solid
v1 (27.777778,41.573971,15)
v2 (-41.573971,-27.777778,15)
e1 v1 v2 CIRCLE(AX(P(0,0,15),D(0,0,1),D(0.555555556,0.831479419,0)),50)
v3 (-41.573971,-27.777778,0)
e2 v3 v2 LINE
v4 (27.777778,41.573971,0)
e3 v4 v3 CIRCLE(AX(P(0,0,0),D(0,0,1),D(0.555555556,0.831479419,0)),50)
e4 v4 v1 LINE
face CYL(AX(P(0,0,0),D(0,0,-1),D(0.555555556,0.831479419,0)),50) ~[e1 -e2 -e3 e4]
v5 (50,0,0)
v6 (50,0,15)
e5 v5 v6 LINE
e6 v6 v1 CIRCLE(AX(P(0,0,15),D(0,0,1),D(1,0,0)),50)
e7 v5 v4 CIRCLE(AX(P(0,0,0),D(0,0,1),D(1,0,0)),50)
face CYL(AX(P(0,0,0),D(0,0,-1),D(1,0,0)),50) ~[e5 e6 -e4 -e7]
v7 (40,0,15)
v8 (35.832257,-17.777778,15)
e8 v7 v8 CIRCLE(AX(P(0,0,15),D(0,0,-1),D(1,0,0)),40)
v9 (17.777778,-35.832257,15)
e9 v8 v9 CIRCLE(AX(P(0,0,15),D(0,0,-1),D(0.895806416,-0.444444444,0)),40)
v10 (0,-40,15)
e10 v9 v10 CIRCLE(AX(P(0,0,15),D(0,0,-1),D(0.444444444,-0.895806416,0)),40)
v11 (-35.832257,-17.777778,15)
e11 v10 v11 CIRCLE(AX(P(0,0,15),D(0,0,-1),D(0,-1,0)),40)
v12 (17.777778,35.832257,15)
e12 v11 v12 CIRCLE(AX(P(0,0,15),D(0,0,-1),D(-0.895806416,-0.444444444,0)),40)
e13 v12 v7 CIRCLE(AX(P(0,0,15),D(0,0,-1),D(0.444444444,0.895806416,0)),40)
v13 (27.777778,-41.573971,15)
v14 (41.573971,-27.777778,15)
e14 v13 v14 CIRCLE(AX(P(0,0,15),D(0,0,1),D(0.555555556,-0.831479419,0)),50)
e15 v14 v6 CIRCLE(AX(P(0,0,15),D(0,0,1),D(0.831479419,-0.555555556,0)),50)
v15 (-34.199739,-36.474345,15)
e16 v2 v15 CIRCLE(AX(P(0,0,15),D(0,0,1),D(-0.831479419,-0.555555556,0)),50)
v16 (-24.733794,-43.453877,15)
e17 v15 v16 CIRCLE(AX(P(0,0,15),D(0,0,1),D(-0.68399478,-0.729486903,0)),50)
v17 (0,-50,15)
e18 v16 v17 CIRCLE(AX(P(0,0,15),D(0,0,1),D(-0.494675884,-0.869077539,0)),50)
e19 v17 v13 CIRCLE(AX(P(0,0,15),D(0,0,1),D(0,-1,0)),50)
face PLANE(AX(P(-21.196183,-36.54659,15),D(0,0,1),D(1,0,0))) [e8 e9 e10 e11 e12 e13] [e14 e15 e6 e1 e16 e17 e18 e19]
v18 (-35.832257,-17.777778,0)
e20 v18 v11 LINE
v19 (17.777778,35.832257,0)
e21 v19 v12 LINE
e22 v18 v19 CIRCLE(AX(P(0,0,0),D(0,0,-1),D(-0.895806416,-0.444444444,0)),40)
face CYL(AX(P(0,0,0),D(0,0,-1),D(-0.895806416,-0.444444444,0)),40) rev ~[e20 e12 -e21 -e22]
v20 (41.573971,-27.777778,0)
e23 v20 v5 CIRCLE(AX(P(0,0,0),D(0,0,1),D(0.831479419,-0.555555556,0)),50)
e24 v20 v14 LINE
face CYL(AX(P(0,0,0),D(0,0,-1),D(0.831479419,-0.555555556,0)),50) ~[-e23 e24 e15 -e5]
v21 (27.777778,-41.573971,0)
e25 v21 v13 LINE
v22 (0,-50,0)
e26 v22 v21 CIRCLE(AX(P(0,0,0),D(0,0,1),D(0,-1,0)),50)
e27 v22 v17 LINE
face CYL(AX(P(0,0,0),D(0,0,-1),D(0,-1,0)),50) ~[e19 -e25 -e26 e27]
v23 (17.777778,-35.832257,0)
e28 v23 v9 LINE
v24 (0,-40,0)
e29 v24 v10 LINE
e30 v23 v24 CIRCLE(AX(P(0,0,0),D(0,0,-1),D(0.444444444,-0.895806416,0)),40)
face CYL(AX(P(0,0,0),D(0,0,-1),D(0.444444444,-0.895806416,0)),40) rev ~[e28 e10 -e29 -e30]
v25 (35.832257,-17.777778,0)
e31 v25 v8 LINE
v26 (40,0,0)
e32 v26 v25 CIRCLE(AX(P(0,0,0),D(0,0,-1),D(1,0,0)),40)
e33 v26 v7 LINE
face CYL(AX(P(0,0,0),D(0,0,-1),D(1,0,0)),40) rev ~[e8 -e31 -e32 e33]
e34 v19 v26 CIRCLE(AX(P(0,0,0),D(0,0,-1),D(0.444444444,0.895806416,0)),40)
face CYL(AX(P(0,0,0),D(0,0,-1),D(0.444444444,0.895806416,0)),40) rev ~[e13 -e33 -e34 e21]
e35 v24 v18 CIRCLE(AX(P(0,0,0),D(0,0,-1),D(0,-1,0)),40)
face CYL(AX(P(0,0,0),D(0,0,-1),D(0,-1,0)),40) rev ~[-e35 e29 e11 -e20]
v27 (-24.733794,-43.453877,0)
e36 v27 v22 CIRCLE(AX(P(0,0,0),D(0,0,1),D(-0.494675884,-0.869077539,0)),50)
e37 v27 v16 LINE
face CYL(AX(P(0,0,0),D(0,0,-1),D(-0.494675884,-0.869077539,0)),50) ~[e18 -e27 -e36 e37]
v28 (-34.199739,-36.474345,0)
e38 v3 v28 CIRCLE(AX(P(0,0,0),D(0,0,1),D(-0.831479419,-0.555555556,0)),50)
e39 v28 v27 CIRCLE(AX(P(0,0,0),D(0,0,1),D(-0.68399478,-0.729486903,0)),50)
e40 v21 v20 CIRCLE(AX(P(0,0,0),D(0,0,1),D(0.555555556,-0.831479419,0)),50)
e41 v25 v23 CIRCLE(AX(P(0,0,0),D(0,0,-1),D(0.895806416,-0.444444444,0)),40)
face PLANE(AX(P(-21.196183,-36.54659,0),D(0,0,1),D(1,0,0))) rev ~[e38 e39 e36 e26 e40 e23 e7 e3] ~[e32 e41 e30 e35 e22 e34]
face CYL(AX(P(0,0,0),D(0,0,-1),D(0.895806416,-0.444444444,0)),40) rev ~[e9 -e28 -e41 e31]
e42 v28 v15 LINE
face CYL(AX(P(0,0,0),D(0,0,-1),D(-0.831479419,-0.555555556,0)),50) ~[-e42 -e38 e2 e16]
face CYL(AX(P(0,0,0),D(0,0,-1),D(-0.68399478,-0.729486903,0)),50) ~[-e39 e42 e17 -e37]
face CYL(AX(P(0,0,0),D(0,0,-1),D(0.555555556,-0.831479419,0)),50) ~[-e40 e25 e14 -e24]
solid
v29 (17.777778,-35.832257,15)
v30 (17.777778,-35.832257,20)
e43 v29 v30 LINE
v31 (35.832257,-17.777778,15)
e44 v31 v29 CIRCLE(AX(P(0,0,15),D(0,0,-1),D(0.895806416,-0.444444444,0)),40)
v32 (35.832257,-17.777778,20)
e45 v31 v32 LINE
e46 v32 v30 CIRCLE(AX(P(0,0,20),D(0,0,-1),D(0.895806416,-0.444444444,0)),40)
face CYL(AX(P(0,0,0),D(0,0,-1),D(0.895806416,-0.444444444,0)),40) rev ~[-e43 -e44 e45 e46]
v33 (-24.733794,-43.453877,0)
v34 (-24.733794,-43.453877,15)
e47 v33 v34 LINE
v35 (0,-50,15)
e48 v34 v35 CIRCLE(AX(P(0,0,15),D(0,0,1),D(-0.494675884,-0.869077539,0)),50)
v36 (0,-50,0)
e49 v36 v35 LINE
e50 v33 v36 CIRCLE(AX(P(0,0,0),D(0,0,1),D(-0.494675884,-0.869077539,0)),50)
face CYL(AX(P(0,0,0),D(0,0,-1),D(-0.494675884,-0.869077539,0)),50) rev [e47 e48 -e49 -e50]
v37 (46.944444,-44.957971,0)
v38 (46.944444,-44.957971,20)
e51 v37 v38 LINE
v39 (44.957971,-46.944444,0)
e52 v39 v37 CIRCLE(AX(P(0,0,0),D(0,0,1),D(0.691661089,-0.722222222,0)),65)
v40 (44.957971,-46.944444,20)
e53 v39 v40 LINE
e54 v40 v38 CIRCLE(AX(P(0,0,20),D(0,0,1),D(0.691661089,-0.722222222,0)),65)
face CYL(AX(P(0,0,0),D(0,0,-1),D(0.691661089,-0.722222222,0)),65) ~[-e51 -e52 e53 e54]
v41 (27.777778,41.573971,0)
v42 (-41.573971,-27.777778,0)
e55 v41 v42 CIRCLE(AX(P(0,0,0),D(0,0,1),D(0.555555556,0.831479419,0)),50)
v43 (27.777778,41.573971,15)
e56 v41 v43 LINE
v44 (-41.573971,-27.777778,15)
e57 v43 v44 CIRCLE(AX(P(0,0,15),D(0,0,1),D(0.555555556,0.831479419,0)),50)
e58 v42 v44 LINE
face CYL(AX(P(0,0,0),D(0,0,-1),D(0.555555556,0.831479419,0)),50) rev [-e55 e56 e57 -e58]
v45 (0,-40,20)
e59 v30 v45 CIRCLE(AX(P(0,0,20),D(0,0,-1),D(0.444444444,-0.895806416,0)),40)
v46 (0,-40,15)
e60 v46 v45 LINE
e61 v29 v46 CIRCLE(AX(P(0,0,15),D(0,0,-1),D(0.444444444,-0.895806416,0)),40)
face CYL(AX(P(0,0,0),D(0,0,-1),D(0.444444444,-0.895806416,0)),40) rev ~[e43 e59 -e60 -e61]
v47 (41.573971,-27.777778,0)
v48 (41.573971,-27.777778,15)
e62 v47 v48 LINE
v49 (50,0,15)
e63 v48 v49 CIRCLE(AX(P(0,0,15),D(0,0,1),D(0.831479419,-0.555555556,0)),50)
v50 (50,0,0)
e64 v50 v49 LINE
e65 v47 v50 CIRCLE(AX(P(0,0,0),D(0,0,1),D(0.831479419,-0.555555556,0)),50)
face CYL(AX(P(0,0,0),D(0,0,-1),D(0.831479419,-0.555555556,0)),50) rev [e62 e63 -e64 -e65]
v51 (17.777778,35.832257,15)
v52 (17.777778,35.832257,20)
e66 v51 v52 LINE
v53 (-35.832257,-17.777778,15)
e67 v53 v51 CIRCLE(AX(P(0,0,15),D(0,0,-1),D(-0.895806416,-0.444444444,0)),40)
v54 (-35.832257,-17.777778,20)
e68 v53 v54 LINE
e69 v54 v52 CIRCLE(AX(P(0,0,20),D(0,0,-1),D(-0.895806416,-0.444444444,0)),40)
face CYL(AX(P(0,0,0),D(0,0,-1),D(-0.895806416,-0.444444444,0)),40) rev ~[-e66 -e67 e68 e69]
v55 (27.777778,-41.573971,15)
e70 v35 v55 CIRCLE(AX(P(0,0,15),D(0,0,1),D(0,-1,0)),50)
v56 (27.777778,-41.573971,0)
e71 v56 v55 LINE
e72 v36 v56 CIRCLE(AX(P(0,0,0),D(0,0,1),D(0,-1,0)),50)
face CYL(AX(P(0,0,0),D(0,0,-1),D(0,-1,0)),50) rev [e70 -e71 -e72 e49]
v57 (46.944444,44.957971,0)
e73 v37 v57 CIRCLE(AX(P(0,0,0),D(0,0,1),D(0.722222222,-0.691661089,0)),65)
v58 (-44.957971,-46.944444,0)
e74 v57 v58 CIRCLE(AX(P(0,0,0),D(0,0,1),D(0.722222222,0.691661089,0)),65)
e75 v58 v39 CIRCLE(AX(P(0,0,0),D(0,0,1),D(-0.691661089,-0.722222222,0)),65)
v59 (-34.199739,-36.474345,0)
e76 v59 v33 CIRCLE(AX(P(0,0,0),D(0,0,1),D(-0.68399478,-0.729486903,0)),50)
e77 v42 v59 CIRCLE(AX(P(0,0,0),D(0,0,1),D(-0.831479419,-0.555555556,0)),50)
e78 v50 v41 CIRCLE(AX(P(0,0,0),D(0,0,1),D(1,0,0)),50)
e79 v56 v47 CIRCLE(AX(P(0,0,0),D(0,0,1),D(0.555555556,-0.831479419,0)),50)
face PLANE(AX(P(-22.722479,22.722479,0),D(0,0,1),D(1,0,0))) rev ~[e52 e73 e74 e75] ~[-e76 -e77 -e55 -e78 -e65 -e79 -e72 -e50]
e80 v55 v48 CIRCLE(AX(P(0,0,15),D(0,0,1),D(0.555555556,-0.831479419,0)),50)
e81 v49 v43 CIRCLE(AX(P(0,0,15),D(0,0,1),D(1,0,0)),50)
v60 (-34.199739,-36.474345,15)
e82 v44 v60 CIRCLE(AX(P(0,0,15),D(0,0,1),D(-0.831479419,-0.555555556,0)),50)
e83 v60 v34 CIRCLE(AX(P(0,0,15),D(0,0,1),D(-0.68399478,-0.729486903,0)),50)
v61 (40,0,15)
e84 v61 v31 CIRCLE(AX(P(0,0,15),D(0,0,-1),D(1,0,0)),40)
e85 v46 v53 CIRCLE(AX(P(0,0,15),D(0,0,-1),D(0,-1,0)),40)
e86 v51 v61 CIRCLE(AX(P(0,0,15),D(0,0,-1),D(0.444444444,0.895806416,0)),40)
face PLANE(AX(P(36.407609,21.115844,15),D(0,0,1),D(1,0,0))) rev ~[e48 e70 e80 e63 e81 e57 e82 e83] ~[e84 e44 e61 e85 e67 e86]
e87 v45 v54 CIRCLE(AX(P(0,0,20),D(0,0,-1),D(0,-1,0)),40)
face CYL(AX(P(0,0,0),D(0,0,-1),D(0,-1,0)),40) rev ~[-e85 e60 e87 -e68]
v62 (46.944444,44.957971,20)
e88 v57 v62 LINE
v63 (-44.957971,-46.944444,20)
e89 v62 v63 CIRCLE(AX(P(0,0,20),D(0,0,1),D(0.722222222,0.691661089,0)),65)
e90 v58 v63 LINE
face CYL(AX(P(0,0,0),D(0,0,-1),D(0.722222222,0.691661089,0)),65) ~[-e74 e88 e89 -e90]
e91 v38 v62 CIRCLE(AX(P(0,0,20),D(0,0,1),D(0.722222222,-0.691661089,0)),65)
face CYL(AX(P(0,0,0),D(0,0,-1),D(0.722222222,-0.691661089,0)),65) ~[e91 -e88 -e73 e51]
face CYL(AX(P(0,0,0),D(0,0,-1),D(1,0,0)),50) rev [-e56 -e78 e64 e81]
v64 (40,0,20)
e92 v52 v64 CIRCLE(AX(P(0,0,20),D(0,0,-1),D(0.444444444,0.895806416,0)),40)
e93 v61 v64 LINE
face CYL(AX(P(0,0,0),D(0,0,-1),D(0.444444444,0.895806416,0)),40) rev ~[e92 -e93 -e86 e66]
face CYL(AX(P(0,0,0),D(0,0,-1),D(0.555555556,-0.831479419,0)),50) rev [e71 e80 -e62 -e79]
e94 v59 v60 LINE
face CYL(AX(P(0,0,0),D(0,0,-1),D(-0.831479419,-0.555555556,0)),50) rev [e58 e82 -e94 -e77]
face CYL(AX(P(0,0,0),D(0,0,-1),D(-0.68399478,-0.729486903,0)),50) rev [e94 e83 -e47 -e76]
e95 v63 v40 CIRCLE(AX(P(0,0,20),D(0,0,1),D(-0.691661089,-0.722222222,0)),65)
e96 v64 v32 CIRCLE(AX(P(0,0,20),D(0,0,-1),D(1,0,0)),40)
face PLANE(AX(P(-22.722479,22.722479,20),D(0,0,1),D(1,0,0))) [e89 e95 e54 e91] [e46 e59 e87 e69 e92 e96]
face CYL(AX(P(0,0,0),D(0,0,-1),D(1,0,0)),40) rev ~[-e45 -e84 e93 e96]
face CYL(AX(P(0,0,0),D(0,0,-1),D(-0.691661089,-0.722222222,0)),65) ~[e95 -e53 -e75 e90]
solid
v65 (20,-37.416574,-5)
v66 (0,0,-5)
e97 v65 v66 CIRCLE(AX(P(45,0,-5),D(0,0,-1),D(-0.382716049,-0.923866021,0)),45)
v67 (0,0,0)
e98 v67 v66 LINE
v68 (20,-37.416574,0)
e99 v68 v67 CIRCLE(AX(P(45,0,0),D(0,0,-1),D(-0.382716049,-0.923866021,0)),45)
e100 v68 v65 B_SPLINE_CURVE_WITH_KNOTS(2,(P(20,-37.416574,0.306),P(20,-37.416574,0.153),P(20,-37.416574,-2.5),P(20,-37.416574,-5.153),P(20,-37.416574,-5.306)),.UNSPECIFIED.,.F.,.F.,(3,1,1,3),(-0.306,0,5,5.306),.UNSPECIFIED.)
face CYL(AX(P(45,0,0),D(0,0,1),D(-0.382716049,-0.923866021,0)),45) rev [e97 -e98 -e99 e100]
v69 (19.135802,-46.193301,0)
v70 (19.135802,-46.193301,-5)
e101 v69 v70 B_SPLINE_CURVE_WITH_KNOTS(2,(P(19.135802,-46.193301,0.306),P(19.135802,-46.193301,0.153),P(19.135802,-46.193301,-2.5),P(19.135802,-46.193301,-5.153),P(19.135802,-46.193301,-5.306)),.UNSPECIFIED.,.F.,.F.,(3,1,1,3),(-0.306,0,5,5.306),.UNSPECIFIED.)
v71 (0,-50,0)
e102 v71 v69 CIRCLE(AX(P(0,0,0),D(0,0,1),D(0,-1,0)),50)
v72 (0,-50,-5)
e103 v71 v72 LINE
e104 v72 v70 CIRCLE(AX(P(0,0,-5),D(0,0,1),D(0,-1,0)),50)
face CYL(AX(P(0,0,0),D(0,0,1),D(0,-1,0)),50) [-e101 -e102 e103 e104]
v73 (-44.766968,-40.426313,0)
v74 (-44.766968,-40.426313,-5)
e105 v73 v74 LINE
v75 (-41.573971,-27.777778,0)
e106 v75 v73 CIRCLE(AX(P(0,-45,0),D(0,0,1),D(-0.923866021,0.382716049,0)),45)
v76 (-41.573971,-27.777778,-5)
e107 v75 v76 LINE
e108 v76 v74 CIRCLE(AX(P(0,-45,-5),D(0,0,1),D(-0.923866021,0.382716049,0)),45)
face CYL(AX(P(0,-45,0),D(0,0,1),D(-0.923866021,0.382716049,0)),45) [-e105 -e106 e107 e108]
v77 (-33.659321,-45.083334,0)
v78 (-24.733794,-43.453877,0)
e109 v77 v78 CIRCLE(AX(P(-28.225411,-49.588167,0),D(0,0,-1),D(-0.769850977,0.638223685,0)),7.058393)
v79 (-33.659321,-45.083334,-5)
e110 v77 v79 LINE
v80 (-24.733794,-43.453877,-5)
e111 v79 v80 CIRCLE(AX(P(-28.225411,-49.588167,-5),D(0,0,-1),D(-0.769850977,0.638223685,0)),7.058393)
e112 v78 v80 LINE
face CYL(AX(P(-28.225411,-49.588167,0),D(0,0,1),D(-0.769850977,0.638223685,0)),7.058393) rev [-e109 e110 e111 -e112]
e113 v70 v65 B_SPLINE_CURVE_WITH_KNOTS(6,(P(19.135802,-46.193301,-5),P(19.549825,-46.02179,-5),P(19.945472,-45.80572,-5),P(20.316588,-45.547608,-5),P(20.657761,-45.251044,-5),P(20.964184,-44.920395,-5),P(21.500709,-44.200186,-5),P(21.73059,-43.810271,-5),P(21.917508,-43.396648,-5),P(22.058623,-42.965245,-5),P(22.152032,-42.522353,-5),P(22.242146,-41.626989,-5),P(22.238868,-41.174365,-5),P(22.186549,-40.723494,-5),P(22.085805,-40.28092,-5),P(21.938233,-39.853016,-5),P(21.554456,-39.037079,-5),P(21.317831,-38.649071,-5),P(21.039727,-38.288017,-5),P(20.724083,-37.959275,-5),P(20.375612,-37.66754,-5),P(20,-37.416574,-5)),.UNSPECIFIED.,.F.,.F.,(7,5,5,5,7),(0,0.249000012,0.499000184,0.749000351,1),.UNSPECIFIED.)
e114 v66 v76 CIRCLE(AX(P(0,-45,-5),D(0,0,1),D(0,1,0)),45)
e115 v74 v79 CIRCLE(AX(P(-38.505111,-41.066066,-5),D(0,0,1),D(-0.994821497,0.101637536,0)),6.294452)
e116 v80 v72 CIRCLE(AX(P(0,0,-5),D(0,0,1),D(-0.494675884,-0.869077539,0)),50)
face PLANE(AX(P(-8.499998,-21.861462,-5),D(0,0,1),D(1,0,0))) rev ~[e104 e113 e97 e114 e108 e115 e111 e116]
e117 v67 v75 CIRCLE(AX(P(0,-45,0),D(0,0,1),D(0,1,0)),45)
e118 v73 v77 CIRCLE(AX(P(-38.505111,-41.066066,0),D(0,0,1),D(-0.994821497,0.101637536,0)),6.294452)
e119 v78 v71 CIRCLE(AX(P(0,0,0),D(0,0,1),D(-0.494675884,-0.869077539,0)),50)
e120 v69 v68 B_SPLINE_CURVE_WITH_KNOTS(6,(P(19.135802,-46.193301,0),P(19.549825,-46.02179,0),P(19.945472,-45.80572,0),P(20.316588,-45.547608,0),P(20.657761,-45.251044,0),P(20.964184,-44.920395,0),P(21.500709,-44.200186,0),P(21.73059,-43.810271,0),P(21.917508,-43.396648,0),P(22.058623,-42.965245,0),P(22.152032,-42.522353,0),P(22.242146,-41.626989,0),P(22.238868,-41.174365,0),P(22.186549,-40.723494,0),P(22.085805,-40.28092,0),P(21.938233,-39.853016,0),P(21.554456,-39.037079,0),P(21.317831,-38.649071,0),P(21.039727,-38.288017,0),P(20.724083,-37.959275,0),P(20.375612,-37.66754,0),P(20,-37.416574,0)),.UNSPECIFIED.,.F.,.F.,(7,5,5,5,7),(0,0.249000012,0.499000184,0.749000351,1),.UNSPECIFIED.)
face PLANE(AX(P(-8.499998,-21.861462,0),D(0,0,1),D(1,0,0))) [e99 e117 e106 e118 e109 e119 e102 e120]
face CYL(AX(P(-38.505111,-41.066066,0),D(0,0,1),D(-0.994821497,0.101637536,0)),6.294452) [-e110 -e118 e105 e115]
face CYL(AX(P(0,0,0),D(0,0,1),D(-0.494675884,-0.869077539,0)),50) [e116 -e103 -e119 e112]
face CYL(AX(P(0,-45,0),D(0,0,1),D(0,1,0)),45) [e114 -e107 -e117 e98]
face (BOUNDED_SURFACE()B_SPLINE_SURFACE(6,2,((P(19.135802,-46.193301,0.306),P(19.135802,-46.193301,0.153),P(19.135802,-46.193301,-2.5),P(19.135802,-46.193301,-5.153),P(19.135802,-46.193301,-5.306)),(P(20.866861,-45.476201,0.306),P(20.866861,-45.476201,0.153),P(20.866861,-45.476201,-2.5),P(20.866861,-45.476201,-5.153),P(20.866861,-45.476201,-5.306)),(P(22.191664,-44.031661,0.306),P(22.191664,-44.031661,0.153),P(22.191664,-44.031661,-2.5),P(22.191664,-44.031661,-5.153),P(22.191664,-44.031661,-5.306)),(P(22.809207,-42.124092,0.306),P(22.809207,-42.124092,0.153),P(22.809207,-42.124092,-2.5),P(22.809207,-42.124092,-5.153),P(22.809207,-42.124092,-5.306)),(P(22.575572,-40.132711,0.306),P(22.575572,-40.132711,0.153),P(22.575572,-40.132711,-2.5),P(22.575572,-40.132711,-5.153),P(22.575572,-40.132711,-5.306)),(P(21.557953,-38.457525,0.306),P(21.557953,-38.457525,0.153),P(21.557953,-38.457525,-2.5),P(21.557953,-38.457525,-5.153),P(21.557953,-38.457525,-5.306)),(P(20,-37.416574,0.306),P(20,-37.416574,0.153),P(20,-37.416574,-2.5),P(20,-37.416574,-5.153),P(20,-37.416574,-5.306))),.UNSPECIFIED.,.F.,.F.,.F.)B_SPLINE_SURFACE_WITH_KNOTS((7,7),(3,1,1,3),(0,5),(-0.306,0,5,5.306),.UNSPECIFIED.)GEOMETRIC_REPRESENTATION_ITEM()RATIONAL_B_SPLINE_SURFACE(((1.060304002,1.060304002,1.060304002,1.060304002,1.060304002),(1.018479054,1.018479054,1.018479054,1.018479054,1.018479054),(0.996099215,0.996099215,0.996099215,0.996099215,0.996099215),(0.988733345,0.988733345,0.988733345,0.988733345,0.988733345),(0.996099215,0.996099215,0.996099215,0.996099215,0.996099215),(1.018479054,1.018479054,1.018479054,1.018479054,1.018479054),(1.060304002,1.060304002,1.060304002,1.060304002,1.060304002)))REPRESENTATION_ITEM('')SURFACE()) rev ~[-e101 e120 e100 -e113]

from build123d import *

# Parameters (mm, degrees)
F1_DEPTH = 20
F2_DEPTH = 15
F3_DEPTH = 15
F4_DEPTH = 5
F5_R     = 5


# Not quite as in the source:
# - a feature names something its author has since deleted; it is built from what else it names


with BuildPart() as f1:
    # F0 (on Top) → F1 (new body)
    with BuildSketch(Plane.XY):
        with BuildLine():
            ThreePointArc((-41.5739709642, -27.7777777778), (-35.3553390593, 35.3553390593), (27.7777777778, 41.5739709642))
            ThreePointArc((27.7777777778, 41.5739709642), (37.1759673359, 44.3146083461), (46.9444444444, 44.9579707705))
            ThreePointArc((46.9444444444, 44.9579707705), (-45.9619407771, 45.9619407771), (-44.9579707705, -46.9444444444))
            ThreePointArc((-44.9579707705, -46.9444444444), (-44.9806919732, -43.6819144147), (-44.7669675939, -40.426313036))
            ThreePointArc((-44.7669675939, -40.426313036), (-43.6312477339, -33.9857264796), (-41.5739709642, -27.7777777778))
        make_face()
        with BuildLine():
            ThreePointArc((45, -45), (36.220156419, -44.1351826403), (27.7777777778, -41.5739709642))
            ThreePointArc((27.7777777778, -41.5739709642), (14.5138115564, -47.8471448898), (0, -50))
            ThreePointArc((0, -50), (-12.7926961833, -48.3357727192), (-24.7337942073, -43.4538769745))
            ThreePointArc((-24.7337942073, -43.4538769745), (-29.4930498897, -42.6445374906), (-33.6593211472, -45.0833340912))
            ThreePointArc((-33.6593211472, -45.0833340912), (-40.9388886222, -46.870964929), (-44.7669675939, -40.426313036))
            ThreePointArc((-44.7669675939, -40.426313036), (-44.9806919732, -43.6819144147), (-44.9579707705, -46.9444444444))
            ThreePointArc((-44.9579707705, -46.9444444444), (0, -65), (44.9579707705, -46.9444444444))
            ThreePointArc((44.9579707705, -46.9444444444), (44.9894914656, -45.9724493115), (45, -45))
        make_face()
        with BuildLine():
            ThreePointArc((27.7777777778, 41.5739709642), (44.0958551844, 23.5702260396), (50, 0))
            ThreePointArc((50, 0), (47.8471448898, -14.5138115564), (41.5739709642, -27.7777777778))
            ThreePointArc((41.5739709642, -27.7777777778), (44.1351826403, -36.220156419), (45, -45))
            ThreePointArc((45, -45), (45.9724493115, -44.9894914656), (46.9444444444, -44.9579707705))
            ThreePointArc((46.9444444444, -44.9579707705), (60.317447264, -24.2240697562), (65, 0))
            ThreePointArc((65, 0), (60.317447264, 24.2240697562), (46.9444444444, 44.9579707705))
            ThreePointArc((46.9444444444, 44.9579707705), (37.1759673359, 44.3146083461), (27.7777777778, 41.5739709642))
        make_face()
        with BuildLine():
            ThreePointArc((45, -45), (44.1351826403, -36.220156419), (41.5739709642, -27.7777777778))
            ThreePointArc((41.5739709642, -27.7777777778), (35.3553390593, -35.3553390593), (27.7777777778, -41.5739709642))
            ThreePointArc((27.7777777778, -41.5739709642), (36.220156419, -44.1351826403), (45, -45))
        make_face()
        with BuildLine():
            ThreePointArc((46.9444444444, -44.9579707705), (45.9724493115, -44.9894914656), (45, -45))
            ThreePointArc((45, -45), (44.9894914656, -45.9724493115), (44.9579707705, -46.9444444444))
            ThreePointArc((44.9579707705, -46.9444444444), (45.9619407771, -45.9619407771), (46.9444444444, -44.9579707705))
        make_face()
        with BuildLine():
            ThreePointArc((-35.8322566591, -17.7777777778), (-28.2842712475, 28.2842712475), (17.7777777778, 35.8322566591))
            ThreePointArc((17.7777777778, 35.8322566591), (22.5931041578, 39.0247487976), (27.7777777778, 41.5739709642))
            ThreePointArc((27.7777777778, 41.5739709642), (-35.3553390593, 35.3553390593), (-41.5739709642, -27.7777777778))
            ThreePointArc((-41.5739709642, -27.7777777778), (-39.0247487976, -22.5931041578), (-35.8322566591, -17.7777777778))
        make_face()
        with BuildLine():
            ThreePointArc((17.7777777778, 35.8322566591), (33.993463424, 21.0818510678), (40, 0))
            Line((40, 0), (50, 0))
            ThreePointArc((50, 0), (44.0958551844, 23.5702260396), (27.7777777778, 41.5739709642))
            ThreePointArc((27.7777777778, 41.5739709642), (22.5931041578, 39.0247487976), (17.7777777778, 35.8322566591))
        make_face()
        with BuildLine():
            Line((50, 0), (40, 0))
            ThreePointArc((40, 0), (38.9441283531, -9.1298886531), (35.8322566591, -17.7777777778))
            ThreePointArc((35.8322566591, -17.7777777778), (39.0247487976, -22.5931041578), (41.5739709642, -27.7777777778))
            ThreePointArc((41.5739709642, -27.7777777778), (47.8471448898, -14.5138115564), (50, 0))
        make_face()
        with BuildLine():
            ThreePointArc((41.5739709642, -27.7777777778), (39.0247487976, -22.5931041578), (35.8322566591, -17.7777777778))
            ThreePointArc((35.8322566591, -17.7777777778), (28.2842712475, -28.2842712475), (17.7777777778, -35.8322566591))
            ThreePointArc((17.7777777778, -35.8322566591), (22.5931041578, -39.0247487976), (27.7777777778, -41.5739709642))
            ThreePointArc((27.7777777778, -41.5739709642), (35.3553390593, -35.3553390593), (41.5739709642, -27.7777777778))
        make_face()
        with BuildLine():
            ThreePointArc((27.7777777778, -41.5739709642), (22.5931041578, -39.0247487976), (17.7777777778, -35.8322566591))
            ThreePointArc((17.7777777778, -35.8322566591), (9.1298886531, -38.9441283531), (0, -40))
            Line((0, -40), (0, -50))
            ThreePointArc((0, -50), (14.5138115564, -47.8471448898), (27.7777777778, -41.5739709642))
        make_face()
        with BuildLine():
            ThreePointArc((0, -40), (-21.0818510678, -33.993463424), (-35.8322566591, -17.7777777778))
            ThreePointArc((-35.8322566591, -17.7777777778), (-39.0247487976, -22.5931041578), (-41.5739709642, -27.7777777778))
            ThreePointArc((-41.5739709642, -27.7777777778), (-38.1355654332, -32.3369548518), (-34.1997389873, -36.4743451373))
            ThreePointArc((-34.1997389873, -36.4743451373), (-29.6726945164, -40.2433994605), (-24.7337942073, -43.4538769745))
            ThreePointArc((-24.7337942073, -43.4538769745), (-12.7926961833, -48.3357727192), (0, -50))
            Line((0, -50), (0, -40))
        make_face()
        with BuildLine():
            ThreePointArc((-34.1997389873, -36.4743451373), (-38.1355654332, -32.3369548518), (-41.5739709642, -27.7777777778))
            ThreePointArc((-41.5739709642, -27.7777777778), (-43.6312477339, -33.9857264796), (-44.7669675939, -40.426313036))
            ThreePointArc((-44.7669675939, -40.426313036), (-40.7099854287, -35.1704182799), (-34.1997389873, -36.4743451373))
        make_face()
        with BuildLine():
            ThreePointArc((-32.2106591377, -41.0660656442), (-32.729295856, -38.564049664), (-34.1997389873, -36.4743451373))
            ThreePointArc((-34.1997389873, -36.4743451373), (-40.7099854287, -35.1704182799), (-44.7669675939, -40.426313036))
            ThreePointArc((-44.7669675939, -40.426313036), (-40.9388886222, -46.870964929), (-33.6593211472, -45.0833340912))
            ThreePointArc((-33.6593211472, -45.0833340912), (-32.5838900439, -43.2013096228), (-32.2106591377, -41.0660656442))
        make_face()
        with BuildLine():
            ThreePointArc((-24.7337942073, -43.4538769745), (-29.6726945164, -40.2433994605), (-34.1997389873, -36.4743451373))
            ThreePointArc((-34.1997389873, -36.4743451373), (-32.729295856, -38.564049664), (-32.2106591377, -41.0660656442))
            ThreePointArc((-32.2106591377, -41.0660656442), (-32.5838900439, -43.2013096228), (-33.6593211472, -45.0833340912))
            ThreePointArc((-33.6593211472, -45.0833340912), (-29.4930498897, -42.6445374906), (-24.7337942073, -43.4538769745))
        make_face()
    extrude(amount=F1_DEPTH)

    # F0 (on Top) → F2 (cut)
    with BuildSketch(Plane.XY):
        with BuildLine():
            ThreePointArc((17.7777777778, 35.8322566591), (33.993463424, 21.0818510678), (40, 0))
            Line((40, 0), (50, 0))
            ThreePointArc((50, 0), (44.0958551844, 23.5702260396), (27.7777777778, 41.5739709642))
            ThreePointArc((27.7777777778, 41.5739709642), (22.5931041578, 39.0247487976), (17.7777777778, 35.8322566591))
        make_face()
        with BuildLine():
            Line((50, 0), (40, 0))
            ThreePointArc((40, 0), (38.9441283531, -9.1298886531), (35.8322566591, -17.7777777778))
            ThreePointArc((35.8322566591, -17.7777777778), (39.0247487976, -22.5931041578), (41.5739709642, -27.7777777778))
            ThreePointArc((41.5739709642, -27.7777777778), (47.8471448898, -14.5138115564), (50, 0))
        make_face()
        with BuildLine():
            ThreePointArc((41.5739709642, -27.7777777778), (39.0247487976, -22.5931041578), (35.8322566591, -17.7777777778))
            ThreePointArc((35.8322566591, -17.7777777778), (28.2842712475, -28.2842712475), (17.7777777778, -35.8322566591))
            ThreePointArc((17.7777777778, -35.8322566591), (22.5931041578, -39.0247487976), (27.7777777778, -41.5739709642))
            ThreePointArc((27.7777777778, -41.5739709642), (35.3553390593, -35.3553390593), (41.5739709642, -27.7777777778))
        make_face()
        with BuildLine():
            ThreePointArc((27.7777777778, -41.5739709642), (22.5931041578, -39.0247487976), (17.7777777778, -35.8322566591))
            ThreePointArc((17.7777777778, -35.8322566591), (9.1298886531, -38.9441283531), (0, -40))
            Line((0, -40), (0, -50))
            ThreePointArc((0, -50), (14.5138115564, -47.8471448898), (27.7777777778, -41.5739709642))
        make_face()
        with BuildLine():
            ThreePointArc((0, -40), (-21.0818510678, -33.993463424), (-35.8322566591, -17.7777777778))
            ThreePointArc((-35.8322566591, -17.7777777778), (-39.0247487976, -22.5931041578), (-41.5739709642, -27.7777777778))
            ThreePointArc((-41.5739709642, -27.7777777778), (-38.1355654332, -32.3369548518), (-34.1997389873, -36.4743451373))
            ThreePointArc((-34.1997389873, -36.4743451373), (-29.6726945164, -40.2433994605), (-24.7337942073, -43.4538769745))
            ThreePointArc((-24.7337942073, -43.4538769745), (-12.7926961833, -48.3357727192), (0, -50))
            Line((0, -50), (0, -40))
        make_face()
        with BuildLine():
            ThreePointArc((-35.8322566591, -17.7777777778), (-28.2842712475, 28.2842712475), (17.7777777778, 35.8322566591))
            ThreePointArc((17.7777777778, 35.8322566591), (22.5931041578, 39.0247487976), (27.7777777778, 41.5739709642))
            ThreePointArc((27.7777777778, 41.5739709642), (-35.3553390593, 35.3553390593), (-41.5739709642, -27.7777777778))
            ThreePointArc((-41.5739709642, -27.7777777778), (-39.0247487976, -22.5931041578), (-35.8322566591, -17.7777777778))
        make_face()
    extrude(amount=F2_DEPTH, mode=Mode.SUBTRACT)


with BuildPart() as f3:
    # F0 (on Top) → F3 (new body)
    with BuildSketch(Plane.XY):
        with BuildLine():
            ThreePointArc((0, -40), (-21.0818510678, -33.993463424), (-35.8322566591, -17.7777777778))
            ThreePointArc((-35.8322566591, -17.7777777778), (-39.0247487976, -22.5931041578), (-41.5739709642, -27.7777777778))
            ThreePointArc((-41.5739709642, -27.7777777778), (-38.1355654332, -32.3369548518), (-34.1997389873, -36.4743451373))
            ThreePointArc((-34.1997389873, -36.4743451373), (-29.6726945164, -40.2433994605), (-24.7337942073, -43.4538769745))
            ThreePointArc((-24.7337942073, -43.4538769745), (-12.7926961833, -48.3357727192), (0, -50))
            Line((0, -50), (0, -40))
        make_face()
        with BuildLine():
            ThreePointArc((27.7777777778, -41.5739709642), (22.5931041578, -39.0247487976), (17.7777777778, -35.8322566591))
            ThreePointArc((17.7777777778, -35.8322566591), (9.1298886531, -38.9441283531), (0, -40))
            Line((0, -40), (0, -50))
            ThreePointArc((0, -50), (14.5138115564, -47.8471448898), (27.7777777778, -41.5739709642))
        make_face()
        with BuildLine():
            ThreePointArc((41.5739709642, -27.7777777778), (39.0247487976, -22.5931041578), (35.8322566591, -17.7777777778))
            ThreePointArc((35.8322566591, -17.7777777778), (28.2842712475, -28.2842712475), (17.7777777778, -35.8322566591))
            ThreePointArc((17.7777777778, -35.8322566591), (22.5931041578, -39.0247487976), (27.7777777778, -41.5739709642))
            ThreePointArc((27.7777777778, -41.5739709642), (35.3553390593, -35.3553390593), (41.5739709642, -27.7777777778))
        make_face()
        with BuildLine():
            Line((50, 0), (40, 0))
            ThreePointArc((40, 0), (38.9441283531, -9.1298886531), (35.8322566591, -17.7777777778))
            ThreePointArc((35.8322566591, -17.7777777778), (39.0247487976, -22.5931041578), (41.5739709642, -27.7777777778))
            ThreePointArc((41.5739709642, -27.7777777778), (47.8471448898, -14.5138115564), (50, 0))
        make_face()
        with BuildLine():
            ThreePointArc((17.7777777778, 35.8322566591), (33.993463424, 21.0818510678), (40, 0))
            Line((40, 0), (50, 0))
            ThreePointArc((50, 0), (44.0958551844, 23.5702260396), (27.7777777778, 41.5739709642))
            ThreePointArc((27.7777777778, 41.5739709642), (22.5931041578, 39.0247487976), (17.7777777778, 35.8322566591))
        make_face()
        with BuildLine():
            ThreePointArc((-35.8322566591, -17.7777777778), (-28.2842712475, 28.2842712475), (17.7777777778, 35.8322566591))
            ThreePointArc((17.7777777778, 35.8322566591), (22.5931041578, 39.0247487976), (27.7777777778, 41.5739709642))
            ThreePointArc((27.7777777778, 41.5739709642), (-35.3553390593, 35.3553390593), (-41.5739709642, -27.7777777778))
            ThreePointArc((-41.5739709642, -27.7777777778), (-39.0247487976, -22.5931041578), (-35.8322566591, -17.7777777778))
        make_face()
    extrude(amount=F3_DEPTH)


with BuildPart() as f4:
    # F0 (on Top) → F4 (new body)
    with BuildSketch(Plane.XY):
        with BuildLine():
            ThreePointArc((0, 0), (-20, -4.6887112585), (-35.8322566591, -17.7777777778))
            ThreePointArc((-35.8322566591, -17.7777777778), (-21.0818510678, -33.993463424), (0, -40))
            ThreePointArc((0, -40), (9.1298886531, -38.9441283531), (17.7777777778, -35.8322566591))
            ThreePointArc((17.7777777778, -35.8322566591), (4.6887112585, -20), (0, 0))
        make_face()
        with BuildLine():
            ThreePointArc((27.7777777778, -41.5739709642), (22.5931041578, -39.0247487976), (17.7777777778, -35.8322566591))
            ThreePointArc((17.7777777778, -35.8322566591), (9.1298886531, -38.9441283531), (0, -40))
            Line((0, -40), (0, -50))
            ThreePointArc((0, -50), (14.5138115564, -47.8471448898), (27.7777777778, -41.5739709642))
        make_face()
        with BuildLine():
            ThreePointArc((0, -40), (-21.0818510678, -33.993463424), (-35.8322566591, -17.7777777778))
            ThreePointArc((-35.8322566591, -17.7777777778), (-39.0247487976, -22.5931041578), (-41.5739709642, -27.7777777778))
            ThreePointArc((-41.5739709642, -27.7777777778), (-38.1355654332, -32.3369548518), (-34.1997389873, -36.4743451373))
            ThreePointArc((-34.1997389873, -36.4743451373), (-29.6726945164, -40.2433994605), (-24.7337942073, -43.4538769745))
            ThreePointArc((-24.7337942073, -43.4538769745), (-12.7926961833, -48.3357727192), (0, -50))
            Line((0, -50), (0, -40))
        make_face()
        with BuildLine():
            ThreePointArc((-34.1997389873, -36.4743451373), (-38.1355654332, -32.3369548518), (-41.5739709642, -27.7777777778))
            ThreePointArc((-41.5739709642, -27.7777777778), (-43.6312477339, -33.9857264796), (-44.7669675939, -40.426313036))
            ThreePointArc((-44.7669675939, -40.426313036), (-40.7099854287, -35.1704182799), (-34.1997389873, -36.4743451373))
        make_face()
        with BuildLine():
            ThreePointArc((-32.2106591377, -41.0660656442), (-32.729295856, -38.564049664), (-34.1997389873, -36.4743451373))
            ThreePointArc((-34.1997389873, -36.4743451373), (-40.7099854287, -35.1704182799), (-44.7669675939, -40.426313036))
            ThreePointArc((-44.7669675939, -40.426313036), (-40.9388886222, -46.870964929), (-33.6593211472, -45.0833340912))
            ThreePointArc((-33.6593211472, -45.0833340912), (-32.5838900439, -43.2013096228), (-32.2106591377, -41.0660656442))
        make_face()
        with BuildLine():
            ThreePointArc((-24.7337942073, -43.4538769745), (-29.6726945164, -40.2433994605), (-34.1997389873, -36.4743451373))
            ThreePointArc((-34.1997389873, -36.4743451373), (-32.729295856, -38.564049664), (-32.2106591377, -41.0660656442))
            ThreePointArc((-32.2106591377, -41.0660656442), (-32.5838900439, -43.2013096228), (-33.6593211472, -45.0833340912))
            ThreePointArc((-33.6593211472, -45.0833340912), (-29.4930498897, -42.6445374906), (-24.7337942073, -43.4538769745))
        make_face()
    extrude(amount=-F4_DEPTH)

    # F5
    f5_edges = [f4.edges().sort_by_distance(p)[0] for p in [
        (27.777778, -41.573971, -2.5),
    ]]
    fillet(f5_edges, radius=F5_R)


solid = Compound([f1.part, f3.part, f4.part])
